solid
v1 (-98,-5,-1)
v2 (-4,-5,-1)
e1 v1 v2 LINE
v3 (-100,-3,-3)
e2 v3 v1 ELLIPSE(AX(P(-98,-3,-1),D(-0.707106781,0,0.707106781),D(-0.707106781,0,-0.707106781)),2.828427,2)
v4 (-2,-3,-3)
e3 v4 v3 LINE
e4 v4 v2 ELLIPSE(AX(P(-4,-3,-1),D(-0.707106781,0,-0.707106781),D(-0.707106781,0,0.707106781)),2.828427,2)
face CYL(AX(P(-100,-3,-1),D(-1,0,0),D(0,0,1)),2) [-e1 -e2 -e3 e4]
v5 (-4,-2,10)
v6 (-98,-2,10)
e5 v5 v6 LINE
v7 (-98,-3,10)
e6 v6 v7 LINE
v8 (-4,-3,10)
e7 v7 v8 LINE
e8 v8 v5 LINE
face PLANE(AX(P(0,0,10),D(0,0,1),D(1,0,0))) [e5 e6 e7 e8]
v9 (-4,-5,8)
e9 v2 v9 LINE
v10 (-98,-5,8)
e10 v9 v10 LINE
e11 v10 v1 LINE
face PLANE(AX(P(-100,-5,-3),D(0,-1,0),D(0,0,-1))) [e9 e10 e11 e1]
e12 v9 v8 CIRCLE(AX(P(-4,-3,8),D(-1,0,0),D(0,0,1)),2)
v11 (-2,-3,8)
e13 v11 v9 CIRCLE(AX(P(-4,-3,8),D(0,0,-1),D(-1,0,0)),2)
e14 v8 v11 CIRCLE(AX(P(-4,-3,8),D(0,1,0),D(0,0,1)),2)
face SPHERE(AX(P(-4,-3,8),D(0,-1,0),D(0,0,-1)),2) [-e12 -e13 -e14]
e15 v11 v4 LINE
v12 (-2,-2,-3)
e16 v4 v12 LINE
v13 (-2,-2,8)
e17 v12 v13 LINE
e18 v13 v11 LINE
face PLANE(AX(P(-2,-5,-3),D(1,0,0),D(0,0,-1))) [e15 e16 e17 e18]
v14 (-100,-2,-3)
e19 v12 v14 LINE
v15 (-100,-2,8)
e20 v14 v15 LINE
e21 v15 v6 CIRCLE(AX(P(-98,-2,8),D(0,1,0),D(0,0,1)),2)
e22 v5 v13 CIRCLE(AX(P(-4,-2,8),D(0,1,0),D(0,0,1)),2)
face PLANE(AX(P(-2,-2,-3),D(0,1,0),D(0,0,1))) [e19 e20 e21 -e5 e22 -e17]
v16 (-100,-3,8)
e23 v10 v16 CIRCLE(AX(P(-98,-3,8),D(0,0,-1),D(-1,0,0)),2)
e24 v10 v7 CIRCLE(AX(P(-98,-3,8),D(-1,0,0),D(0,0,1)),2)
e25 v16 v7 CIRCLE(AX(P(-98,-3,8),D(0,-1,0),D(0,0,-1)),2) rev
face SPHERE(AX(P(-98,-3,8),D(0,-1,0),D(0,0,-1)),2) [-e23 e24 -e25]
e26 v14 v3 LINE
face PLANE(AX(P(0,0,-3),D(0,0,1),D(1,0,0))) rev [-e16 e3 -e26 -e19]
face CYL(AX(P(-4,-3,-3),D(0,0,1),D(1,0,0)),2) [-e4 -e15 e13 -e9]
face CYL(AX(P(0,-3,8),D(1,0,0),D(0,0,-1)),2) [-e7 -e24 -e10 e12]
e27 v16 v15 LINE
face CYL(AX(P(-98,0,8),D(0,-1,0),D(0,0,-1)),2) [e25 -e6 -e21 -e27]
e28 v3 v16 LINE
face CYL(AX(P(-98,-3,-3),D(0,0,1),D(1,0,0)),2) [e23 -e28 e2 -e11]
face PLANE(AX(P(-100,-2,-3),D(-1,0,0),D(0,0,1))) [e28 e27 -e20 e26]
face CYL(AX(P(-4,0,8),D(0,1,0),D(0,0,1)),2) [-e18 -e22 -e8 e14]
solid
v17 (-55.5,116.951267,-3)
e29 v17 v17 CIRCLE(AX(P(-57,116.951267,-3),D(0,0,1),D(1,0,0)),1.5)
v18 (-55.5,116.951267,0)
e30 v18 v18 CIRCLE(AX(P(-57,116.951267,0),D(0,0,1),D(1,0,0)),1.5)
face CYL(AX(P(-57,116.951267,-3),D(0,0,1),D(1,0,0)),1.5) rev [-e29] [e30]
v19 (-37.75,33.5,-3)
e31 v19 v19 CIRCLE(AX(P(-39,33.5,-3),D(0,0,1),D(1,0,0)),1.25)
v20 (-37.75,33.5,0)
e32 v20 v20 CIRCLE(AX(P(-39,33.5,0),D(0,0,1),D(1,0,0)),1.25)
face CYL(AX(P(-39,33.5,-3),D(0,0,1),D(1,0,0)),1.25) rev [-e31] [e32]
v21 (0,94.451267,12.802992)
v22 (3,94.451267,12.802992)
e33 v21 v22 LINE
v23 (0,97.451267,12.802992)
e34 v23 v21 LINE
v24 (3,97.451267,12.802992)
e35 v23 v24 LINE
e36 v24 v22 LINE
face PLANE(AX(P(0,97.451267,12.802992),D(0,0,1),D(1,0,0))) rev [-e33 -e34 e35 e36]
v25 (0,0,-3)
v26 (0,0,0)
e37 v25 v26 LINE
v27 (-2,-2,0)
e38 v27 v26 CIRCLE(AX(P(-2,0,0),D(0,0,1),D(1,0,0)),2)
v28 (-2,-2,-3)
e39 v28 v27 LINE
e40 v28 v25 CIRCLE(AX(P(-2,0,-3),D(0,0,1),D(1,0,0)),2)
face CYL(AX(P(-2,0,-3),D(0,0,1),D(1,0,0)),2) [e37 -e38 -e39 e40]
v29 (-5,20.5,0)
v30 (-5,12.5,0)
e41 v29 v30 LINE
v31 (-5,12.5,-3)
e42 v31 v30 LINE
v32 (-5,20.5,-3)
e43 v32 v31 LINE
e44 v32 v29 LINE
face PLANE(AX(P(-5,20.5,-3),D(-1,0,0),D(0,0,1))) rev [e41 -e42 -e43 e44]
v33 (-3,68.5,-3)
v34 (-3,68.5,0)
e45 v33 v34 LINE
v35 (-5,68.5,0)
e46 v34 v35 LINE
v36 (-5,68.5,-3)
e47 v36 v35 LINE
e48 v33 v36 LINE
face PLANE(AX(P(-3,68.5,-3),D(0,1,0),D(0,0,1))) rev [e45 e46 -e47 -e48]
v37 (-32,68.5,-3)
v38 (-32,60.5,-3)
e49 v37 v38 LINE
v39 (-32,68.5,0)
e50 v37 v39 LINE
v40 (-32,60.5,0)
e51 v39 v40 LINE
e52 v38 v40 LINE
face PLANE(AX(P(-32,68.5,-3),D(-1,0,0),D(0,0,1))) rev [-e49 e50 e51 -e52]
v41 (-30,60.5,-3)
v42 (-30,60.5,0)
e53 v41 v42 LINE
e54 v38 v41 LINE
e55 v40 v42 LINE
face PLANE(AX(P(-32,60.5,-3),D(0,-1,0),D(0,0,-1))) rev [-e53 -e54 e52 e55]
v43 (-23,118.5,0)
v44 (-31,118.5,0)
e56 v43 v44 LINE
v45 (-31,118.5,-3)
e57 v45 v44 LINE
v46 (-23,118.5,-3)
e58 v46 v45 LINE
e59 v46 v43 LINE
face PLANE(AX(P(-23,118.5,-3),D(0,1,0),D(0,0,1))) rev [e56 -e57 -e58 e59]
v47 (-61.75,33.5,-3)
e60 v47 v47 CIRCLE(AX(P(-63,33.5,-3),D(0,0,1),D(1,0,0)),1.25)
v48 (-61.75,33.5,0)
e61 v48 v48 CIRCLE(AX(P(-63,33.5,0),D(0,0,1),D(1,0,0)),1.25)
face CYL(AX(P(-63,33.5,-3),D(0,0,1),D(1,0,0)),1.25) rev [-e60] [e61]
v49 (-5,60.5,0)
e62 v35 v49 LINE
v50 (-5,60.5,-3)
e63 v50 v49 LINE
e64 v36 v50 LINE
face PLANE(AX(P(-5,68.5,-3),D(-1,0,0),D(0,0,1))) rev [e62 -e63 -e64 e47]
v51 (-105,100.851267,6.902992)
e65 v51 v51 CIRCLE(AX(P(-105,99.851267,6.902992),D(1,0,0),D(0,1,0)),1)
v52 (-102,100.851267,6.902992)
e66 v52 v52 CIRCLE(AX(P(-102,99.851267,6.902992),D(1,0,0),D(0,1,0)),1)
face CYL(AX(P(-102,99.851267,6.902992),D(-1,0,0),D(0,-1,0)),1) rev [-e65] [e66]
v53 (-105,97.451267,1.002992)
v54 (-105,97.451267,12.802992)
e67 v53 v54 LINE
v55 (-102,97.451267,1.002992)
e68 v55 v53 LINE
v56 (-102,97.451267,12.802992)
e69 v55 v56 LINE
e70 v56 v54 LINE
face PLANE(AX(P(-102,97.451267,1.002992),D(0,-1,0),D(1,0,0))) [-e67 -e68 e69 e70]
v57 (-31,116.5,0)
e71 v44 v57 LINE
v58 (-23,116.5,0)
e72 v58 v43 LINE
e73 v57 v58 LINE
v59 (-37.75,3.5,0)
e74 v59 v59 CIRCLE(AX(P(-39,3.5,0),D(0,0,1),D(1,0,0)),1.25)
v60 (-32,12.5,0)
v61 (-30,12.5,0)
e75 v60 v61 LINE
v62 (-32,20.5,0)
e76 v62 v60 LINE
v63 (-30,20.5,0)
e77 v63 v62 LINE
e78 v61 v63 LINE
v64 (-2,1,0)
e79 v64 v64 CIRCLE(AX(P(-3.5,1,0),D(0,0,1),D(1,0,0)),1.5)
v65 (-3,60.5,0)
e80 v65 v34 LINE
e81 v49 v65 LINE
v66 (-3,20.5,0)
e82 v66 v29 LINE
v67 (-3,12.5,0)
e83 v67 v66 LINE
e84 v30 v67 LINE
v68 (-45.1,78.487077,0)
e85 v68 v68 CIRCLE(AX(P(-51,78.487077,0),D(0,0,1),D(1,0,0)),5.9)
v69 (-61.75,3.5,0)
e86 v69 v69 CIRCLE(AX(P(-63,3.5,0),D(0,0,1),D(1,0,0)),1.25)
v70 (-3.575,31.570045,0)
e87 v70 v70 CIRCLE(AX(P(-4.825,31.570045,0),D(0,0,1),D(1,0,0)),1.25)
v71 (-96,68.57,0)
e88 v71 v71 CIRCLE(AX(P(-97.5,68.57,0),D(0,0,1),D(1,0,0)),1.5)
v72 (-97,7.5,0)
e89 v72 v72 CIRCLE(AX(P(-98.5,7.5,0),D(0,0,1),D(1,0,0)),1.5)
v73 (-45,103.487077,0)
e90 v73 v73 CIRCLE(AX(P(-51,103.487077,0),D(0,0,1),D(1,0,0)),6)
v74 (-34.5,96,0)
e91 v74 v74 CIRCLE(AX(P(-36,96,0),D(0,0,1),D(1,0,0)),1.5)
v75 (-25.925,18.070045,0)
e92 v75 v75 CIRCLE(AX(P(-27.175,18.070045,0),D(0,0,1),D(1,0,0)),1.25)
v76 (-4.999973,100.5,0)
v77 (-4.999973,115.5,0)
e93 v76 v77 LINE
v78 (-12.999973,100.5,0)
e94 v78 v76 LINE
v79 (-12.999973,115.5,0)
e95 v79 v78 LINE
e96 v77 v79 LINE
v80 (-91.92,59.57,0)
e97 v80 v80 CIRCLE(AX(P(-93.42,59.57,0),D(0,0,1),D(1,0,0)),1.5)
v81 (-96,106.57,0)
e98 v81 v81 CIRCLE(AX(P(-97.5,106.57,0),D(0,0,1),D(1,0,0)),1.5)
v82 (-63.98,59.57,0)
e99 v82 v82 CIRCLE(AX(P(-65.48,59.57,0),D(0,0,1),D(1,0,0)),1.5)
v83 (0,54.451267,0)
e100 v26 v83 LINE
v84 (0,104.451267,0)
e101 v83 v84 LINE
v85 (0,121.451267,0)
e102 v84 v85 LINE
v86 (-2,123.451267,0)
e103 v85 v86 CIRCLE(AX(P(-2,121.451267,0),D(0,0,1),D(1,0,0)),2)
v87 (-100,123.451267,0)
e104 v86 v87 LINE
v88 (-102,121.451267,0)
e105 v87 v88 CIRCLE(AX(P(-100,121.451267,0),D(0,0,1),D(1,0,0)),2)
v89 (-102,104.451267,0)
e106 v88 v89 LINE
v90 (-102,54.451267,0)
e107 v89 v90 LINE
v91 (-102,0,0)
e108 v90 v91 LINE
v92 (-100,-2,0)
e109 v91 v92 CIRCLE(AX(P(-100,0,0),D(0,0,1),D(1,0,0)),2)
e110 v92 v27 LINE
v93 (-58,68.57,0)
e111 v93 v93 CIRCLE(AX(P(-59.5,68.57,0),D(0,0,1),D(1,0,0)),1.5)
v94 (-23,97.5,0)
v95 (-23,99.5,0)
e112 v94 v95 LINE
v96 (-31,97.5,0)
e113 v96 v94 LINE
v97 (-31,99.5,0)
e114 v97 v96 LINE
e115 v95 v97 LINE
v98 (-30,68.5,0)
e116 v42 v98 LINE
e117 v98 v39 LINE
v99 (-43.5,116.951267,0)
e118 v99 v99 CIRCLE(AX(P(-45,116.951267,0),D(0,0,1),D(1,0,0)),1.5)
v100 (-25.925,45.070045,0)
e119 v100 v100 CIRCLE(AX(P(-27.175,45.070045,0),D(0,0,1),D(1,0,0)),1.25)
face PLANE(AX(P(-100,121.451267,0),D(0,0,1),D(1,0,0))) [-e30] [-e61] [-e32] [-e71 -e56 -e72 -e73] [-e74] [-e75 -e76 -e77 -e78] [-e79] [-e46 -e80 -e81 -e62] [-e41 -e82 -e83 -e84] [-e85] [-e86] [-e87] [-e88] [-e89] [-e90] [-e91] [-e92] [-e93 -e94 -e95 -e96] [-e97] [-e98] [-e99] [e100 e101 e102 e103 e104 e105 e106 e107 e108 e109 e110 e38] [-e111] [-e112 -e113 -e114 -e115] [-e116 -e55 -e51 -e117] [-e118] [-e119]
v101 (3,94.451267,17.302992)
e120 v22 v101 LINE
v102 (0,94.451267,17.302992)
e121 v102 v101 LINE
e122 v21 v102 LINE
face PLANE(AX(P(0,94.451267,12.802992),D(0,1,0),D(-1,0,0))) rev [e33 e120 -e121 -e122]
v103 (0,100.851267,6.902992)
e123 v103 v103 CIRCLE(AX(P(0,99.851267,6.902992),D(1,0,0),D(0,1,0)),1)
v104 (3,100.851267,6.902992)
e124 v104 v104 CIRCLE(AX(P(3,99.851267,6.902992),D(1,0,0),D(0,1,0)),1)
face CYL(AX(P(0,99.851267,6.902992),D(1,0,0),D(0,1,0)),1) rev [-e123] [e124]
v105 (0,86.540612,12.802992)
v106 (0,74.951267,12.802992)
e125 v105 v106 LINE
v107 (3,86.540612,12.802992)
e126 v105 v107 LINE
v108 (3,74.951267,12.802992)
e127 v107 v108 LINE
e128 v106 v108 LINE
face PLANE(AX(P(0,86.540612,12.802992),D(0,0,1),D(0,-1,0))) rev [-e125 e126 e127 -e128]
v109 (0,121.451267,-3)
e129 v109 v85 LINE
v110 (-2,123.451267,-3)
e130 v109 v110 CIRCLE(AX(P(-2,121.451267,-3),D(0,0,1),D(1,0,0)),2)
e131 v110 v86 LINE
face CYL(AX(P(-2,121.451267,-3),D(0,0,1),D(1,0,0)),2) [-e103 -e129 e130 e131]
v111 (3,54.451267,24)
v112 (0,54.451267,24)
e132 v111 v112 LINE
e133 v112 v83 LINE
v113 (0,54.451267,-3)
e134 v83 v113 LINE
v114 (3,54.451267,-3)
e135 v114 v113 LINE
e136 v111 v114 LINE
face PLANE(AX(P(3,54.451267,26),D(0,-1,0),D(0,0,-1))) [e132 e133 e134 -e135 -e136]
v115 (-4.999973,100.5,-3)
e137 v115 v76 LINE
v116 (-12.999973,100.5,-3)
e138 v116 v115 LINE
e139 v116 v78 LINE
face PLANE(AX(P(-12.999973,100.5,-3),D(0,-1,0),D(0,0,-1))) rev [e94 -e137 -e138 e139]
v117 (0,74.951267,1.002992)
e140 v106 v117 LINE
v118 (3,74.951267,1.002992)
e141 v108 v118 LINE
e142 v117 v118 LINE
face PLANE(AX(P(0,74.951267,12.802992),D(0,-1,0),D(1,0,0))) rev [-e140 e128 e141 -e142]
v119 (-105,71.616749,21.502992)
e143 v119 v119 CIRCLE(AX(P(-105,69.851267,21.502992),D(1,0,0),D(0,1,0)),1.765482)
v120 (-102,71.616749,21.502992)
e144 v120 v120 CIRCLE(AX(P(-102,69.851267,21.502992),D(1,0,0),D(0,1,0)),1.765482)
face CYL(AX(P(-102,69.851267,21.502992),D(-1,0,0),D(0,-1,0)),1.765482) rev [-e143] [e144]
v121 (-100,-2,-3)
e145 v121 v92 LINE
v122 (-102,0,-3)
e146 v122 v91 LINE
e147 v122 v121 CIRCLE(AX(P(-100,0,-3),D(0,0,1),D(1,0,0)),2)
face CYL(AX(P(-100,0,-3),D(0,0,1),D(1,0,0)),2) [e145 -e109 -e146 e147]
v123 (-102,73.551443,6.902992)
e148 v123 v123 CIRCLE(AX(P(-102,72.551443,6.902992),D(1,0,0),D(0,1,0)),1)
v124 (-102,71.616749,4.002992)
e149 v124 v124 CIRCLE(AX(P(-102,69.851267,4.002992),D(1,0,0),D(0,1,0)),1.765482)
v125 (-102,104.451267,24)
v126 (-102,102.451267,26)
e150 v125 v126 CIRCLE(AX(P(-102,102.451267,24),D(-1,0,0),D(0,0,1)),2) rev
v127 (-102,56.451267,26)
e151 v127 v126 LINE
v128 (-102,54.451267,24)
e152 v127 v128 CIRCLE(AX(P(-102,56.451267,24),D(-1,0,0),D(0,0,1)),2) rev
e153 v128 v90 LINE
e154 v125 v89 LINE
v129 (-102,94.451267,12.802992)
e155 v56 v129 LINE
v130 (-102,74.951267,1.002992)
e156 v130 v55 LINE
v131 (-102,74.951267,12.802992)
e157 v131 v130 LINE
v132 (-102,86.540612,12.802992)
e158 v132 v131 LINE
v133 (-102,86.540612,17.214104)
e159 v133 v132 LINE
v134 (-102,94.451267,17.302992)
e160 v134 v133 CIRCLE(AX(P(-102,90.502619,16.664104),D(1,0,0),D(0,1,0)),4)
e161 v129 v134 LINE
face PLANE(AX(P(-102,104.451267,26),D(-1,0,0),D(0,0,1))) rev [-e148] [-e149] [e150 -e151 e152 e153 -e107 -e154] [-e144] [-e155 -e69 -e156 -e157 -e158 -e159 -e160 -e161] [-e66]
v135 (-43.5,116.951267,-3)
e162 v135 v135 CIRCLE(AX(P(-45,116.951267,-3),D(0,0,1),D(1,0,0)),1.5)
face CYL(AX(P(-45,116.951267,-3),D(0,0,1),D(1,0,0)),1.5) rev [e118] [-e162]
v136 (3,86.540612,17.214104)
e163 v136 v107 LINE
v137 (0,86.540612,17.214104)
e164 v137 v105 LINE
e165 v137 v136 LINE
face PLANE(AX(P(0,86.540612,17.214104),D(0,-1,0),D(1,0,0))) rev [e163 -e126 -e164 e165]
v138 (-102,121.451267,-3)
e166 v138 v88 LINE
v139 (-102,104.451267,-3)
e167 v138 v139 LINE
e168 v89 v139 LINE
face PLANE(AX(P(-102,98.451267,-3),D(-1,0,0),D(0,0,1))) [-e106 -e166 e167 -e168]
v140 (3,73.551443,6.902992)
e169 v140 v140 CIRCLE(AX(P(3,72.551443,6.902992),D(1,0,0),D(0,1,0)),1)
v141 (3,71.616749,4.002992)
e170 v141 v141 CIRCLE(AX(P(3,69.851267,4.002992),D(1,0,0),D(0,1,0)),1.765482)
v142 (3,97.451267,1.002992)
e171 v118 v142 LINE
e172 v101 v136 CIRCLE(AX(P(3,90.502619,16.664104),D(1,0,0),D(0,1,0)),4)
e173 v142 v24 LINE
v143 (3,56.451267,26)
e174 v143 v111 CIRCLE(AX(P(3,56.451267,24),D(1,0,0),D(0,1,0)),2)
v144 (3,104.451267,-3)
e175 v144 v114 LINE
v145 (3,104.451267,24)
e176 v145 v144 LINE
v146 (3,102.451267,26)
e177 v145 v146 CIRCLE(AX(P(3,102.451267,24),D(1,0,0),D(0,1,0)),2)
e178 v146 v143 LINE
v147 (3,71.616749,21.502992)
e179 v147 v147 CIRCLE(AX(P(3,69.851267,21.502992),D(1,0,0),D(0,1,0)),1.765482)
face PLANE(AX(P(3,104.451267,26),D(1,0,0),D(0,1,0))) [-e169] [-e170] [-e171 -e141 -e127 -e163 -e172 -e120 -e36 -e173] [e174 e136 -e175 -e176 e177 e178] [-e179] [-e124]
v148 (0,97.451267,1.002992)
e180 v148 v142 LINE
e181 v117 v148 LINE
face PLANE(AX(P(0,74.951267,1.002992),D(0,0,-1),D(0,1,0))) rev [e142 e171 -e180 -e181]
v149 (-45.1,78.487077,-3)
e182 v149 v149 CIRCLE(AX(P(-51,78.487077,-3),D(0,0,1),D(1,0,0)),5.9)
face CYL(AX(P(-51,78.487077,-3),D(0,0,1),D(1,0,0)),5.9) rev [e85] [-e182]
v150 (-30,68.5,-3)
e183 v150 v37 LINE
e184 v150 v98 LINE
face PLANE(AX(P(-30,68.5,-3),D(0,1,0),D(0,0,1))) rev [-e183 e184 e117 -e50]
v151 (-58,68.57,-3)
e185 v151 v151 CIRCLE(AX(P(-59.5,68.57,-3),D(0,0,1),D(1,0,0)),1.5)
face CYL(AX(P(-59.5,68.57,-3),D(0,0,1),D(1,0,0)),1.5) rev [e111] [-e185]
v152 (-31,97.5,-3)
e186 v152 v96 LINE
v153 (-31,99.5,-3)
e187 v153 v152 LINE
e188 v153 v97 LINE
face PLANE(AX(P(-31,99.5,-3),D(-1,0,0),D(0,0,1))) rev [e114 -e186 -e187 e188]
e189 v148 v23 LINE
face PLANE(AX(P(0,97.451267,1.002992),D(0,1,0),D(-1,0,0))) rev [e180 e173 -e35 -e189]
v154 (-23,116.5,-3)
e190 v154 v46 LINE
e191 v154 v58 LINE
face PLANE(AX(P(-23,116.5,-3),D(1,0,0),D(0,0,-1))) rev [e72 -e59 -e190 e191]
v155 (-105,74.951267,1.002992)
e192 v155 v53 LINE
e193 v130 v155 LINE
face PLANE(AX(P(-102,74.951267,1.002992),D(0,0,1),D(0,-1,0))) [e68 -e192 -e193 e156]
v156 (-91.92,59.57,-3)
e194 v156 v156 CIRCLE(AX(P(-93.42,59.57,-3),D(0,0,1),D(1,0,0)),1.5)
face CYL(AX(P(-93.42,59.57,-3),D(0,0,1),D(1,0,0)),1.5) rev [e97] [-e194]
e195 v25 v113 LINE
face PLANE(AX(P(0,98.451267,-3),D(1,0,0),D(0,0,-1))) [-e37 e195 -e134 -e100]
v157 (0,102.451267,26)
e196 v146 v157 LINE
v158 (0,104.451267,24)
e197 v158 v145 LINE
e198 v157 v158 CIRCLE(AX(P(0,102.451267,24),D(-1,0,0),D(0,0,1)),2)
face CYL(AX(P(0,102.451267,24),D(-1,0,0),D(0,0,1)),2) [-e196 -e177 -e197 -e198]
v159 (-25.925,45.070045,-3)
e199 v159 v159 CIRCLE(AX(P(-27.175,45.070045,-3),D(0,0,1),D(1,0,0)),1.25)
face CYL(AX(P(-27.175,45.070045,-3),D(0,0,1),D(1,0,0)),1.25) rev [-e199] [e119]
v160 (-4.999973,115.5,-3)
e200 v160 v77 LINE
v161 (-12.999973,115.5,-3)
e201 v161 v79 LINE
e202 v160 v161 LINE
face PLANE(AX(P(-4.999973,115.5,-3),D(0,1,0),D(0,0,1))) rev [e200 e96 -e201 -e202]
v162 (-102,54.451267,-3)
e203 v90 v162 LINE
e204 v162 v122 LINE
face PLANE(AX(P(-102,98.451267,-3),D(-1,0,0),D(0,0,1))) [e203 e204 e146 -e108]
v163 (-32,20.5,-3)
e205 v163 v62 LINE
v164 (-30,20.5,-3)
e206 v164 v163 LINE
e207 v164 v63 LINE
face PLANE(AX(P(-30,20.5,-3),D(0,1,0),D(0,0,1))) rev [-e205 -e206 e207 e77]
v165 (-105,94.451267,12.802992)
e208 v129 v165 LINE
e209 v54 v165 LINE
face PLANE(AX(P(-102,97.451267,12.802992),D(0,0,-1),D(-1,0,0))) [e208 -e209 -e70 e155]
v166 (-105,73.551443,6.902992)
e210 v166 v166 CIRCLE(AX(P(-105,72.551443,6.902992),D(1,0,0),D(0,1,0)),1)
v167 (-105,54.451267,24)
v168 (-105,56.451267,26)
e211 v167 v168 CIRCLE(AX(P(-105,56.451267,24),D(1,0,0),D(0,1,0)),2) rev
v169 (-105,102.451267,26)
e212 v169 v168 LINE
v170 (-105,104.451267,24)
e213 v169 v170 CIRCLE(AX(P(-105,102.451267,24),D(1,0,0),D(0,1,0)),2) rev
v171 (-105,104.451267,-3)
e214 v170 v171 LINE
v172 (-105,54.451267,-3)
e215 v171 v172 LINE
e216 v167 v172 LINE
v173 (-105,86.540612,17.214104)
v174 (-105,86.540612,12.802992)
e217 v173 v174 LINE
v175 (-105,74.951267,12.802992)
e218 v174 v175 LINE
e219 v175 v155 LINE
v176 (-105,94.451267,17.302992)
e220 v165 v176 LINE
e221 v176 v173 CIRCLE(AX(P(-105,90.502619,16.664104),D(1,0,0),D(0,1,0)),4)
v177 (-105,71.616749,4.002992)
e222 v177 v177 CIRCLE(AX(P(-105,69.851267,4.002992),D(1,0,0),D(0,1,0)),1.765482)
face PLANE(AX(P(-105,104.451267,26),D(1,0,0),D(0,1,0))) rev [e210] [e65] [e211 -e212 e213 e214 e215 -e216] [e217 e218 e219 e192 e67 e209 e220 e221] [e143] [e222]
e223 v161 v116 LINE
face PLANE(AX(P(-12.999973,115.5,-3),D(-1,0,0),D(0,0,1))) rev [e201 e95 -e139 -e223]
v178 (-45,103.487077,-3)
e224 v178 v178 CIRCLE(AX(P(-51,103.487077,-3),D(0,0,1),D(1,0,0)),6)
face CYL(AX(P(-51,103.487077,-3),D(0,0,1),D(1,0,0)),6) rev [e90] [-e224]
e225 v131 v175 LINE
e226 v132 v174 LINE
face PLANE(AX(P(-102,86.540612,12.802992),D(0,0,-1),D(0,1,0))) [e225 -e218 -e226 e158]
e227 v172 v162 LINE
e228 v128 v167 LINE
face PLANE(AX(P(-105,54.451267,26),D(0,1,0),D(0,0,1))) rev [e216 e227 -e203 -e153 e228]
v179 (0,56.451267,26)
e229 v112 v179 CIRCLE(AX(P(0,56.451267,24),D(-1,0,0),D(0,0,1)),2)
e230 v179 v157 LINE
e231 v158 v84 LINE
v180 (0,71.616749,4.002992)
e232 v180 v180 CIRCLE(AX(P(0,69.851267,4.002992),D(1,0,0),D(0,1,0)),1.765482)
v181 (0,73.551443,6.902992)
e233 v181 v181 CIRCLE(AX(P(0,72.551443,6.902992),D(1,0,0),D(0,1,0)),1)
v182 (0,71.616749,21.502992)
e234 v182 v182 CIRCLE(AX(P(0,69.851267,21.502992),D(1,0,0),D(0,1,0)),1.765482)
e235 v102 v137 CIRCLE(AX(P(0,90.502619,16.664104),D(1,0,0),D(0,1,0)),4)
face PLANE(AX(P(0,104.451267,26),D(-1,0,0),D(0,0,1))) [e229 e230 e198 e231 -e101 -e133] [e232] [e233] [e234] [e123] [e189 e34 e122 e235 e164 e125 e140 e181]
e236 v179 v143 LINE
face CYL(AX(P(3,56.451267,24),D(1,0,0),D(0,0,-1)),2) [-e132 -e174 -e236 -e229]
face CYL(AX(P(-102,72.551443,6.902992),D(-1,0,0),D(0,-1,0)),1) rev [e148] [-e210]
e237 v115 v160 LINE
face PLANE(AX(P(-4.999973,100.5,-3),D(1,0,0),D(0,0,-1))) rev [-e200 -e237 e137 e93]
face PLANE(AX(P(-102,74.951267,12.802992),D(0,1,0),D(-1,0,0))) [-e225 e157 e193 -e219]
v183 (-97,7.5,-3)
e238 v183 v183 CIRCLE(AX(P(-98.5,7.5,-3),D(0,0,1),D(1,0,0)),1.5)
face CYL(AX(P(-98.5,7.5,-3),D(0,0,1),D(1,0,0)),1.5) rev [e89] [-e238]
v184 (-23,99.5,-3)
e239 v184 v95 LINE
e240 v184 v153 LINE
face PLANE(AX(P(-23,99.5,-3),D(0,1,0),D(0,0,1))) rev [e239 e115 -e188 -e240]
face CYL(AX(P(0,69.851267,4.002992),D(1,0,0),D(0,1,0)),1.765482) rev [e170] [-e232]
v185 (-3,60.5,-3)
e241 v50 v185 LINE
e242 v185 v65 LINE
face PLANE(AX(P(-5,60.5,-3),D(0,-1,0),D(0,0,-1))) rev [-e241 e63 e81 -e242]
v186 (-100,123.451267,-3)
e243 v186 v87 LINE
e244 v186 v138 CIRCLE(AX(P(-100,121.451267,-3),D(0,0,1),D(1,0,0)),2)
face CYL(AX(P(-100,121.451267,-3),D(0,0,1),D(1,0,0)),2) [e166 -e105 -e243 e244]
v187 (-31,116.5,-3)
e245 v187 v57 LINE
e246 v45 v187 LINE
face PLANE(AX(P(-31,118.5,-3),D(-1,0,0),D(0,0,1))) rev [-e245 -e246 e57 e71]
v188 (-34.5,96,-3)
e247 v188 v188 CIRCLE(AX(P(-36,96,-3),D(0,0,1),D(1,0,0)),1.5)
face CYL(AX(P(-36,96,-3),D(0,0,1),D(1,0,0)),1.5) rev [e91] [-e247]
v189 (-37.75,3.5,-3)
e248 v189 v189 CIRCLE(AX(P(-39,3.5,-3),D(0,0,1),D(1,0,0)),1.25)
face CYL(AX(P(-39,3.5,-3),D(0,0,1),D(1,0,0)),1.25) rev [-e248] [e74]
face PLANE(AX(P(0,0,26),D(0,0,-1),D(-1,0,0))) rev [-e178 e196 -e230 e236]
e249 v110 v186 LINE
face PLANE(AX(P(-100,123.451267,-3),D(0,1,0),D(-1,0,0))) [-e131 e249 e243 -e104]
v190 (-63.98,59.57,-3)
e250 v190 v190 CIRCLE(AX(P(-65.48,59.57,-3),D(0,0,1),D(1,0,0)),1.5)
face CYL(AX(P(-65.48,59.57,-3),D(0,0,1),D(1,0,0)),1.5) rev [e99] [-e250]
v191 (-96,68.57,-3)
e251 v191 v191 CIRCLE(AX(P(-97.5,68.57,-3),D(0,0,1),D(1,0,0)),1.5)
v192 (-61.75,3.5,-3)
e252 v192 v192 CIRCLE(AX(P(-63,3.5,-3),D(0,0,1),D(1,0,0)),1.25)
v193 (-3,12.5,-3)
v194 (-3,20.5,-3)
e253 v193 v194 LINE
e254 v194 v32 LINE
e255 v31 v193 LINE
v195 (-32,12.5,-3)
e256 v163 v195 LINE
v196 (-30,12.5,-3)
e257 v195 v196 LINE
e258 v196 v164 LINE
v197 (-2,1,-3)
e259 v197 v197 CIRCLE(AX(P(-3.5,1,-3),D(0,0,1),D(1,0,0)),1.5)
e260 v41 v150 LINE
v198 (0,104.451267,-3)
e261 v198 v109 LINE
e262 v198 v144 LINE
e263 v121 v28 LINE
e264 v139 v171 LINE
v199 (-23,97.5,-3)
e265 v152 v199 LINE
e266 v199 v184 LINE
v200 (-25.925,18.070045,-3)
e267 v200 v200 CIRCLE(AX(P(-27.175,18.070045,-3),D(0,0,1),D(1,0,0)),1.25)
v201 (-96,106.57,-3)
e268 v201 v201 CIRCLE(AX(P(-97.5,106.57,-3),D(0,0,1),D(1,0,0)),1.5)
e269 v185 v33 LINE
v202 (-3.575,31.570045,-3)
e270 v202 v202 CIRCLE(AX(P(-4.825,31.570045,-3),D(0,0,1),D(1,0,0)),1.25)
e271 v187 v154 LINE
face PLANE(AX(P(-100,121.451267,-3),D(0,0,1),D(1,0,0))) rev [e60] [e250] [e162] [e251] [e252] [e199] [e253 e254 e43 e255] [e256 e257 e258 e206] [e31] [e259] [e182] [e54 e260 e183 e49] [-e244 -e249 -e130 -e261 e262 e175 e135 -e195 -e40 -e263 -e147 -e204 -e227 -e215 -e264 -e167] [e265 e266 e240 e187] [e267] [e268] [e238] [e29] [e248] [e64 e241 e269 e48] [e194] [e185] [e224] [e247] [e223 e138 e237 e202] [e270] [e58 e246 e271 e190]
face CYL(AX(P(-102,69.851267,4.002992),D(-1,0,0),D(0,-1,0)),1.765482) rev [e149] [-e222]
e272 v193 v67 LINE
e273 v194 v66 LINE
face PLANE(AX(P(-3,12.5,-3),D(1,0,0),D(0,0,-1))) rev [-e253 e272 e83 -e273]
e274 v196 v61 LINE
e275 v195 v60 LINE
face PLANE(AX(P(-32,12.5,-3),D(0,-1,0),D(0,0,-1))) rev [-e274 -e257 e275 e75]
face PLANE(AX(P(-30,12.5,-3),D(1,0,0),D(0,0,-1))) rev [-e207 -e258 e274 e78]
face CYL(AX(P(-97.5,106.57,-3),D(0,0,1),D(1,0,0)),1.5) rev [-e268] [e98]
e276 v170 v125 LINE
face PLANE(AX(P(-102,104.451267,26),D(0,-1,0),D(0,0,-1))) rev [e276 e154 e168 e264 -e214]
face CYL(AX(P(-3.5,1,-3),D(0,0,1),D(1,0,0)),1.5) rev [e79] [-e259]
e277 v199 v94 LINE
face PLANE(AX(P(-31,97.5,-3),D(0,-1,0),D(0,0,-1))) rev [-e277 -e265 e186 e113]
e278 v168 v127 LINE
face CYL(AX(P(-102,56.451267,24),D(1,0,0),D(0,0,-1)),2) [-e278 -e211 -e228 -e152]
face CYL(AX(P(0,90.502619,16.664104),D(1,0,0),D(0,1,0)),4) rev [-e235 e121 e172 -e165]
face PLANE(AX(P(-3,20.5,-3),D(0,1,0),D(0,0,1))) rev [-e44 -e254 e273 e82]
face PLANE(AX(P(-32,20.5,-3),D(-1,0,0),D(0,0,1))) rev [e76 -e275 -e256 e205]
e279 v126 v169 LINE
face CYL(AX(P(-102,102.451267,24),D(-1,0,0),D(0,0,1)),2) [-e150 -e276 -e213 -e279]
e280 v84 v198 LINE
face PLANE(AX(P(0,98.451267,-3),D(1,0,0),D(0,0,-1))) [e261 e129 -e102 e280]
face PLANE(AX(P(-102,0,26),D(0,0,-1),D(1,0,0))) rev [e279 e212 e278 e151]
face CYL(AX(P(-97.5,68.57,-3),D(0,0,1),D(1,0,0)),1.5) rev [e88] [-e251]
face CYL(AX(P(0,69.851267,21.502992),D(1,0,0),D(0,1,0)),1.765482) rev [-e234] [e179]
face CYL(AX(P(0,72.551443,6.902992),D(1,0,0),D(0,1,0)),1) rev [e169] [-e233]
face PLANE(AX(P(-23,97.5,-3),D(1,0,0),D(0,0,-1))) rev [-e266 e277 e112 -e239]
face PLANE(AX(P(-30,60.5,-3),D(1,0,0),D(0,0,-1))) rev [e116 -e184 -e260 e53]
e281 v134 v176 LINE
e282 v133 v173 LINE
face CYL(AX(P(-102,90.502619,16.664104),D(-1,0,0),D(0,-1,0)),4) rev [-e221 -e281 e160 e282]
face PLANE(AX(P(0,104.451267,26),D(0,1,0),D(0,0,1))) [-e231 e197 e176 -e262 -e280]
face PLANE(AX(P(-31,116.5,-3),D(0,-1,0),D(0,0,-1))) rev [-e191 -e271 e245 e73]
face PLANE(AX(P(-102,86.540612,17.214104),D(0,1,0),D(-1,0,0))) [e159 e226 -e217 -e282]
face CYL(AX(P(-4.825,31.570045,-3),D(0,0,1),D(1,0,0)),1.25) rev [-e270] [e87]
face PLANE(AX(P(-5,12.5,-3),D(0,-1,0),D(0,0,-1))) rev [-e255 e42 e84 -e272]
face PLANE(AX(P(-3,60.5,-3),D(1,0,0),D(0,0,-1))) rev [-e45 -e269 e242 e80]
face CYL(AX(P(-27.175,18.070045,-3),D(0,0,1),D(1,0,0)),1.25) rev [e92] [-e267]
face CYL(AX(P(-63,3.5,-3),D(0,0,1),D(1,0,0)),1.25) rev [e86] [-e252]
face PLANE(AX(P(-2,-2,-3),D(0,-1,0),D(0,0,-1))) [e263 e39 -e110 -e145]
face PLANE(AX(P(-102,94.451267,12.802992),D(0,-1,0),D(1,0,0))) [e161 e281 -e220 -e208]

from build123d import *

# Parameters (mm, degrees)
MODEL_R                      = 6
MODEL_R_2                    = 1.5
MODEL_R_3                    = 1.25
MODEL_R_4                    = 5.9
MODEL_W                      = 8
MODEL_H                      = 2
MODEL_H_2                    = 15
MODEL_W_2                    = 2
MODEL_H_3                    = 8
SALIENTE_EXTRUIR1_DEPTH      = 3
CROQUIS3_W                   = 3
CROQUIS3_H                   = 50
SALIENTE_EXTRUIR2_DEPTH      = 29
CROQUIS4_R                   = 1.765481919
CROQUIS4_R_2                 = 1
CORTAR_EXTRUIR1_DEPTH        = 3
SALIENTE_EXTRUIR3_DEPTH      = 10
SALIENTE_EXTRUIR3_DEPTH_BACK = 3
CROQUIS5_W                   = 98
CROQUIS5_H                   = 3
REDONDEO1_R                  = 2
REDONDEO2_R                  = 2
SIMETR_A2_START              = -105
SIMETR_A2_OUTLINE_R          = 1.765481919
SIMETR_A2_OUTLINE_R_2        = 1
SIMETR_A2_DEPTH              = 3
REDONDEO3_R                  = 2


# Read off the part's stored shape, not the designer's step: Simetría2
with BuildPart() as part:
    # Model → Saliente-Extruir1 (new body)
    with BuildSketch(Plane.XY):
        with BuildLine():
            Line((-97.99999958, -2), (-4, -2))
            Line((-4, -2), (-2, -2))
            ThreePointArc((-2, -2), (-0.585786438, -1.414213562), (0, 0))
            Line((0, 0), (0, 98.451266928))
            Line((0, 98.451266928), (0, 121.451266928))
            ThreePointArc((0, 121.451266928), (-0.585786438, 122.865480491), (-2, 123.451266928))
            Line((-2, 123.451266928), (-15.5, 123.451266928))
            Line((-15.5, 123.451266928), (-86.49999958, 123.451266928))
            Line((-86.49999958, 123.451266928), (-99.99999958, 123.451266928))
            ThreePointArc((-99.99999958, 123.451266928), (-101.414213142, 122.865480491), (-101.99999958, 121.451266928))
            Line((-101.99999958, 121.451266928), (-101.99999958, 98.451266928))
            Line((-101.99999958, 98.451266928), (-101.99999958, 0))
            ThreePointArc((-101.99999958, 0), (-101.414213142, -1.414213562), (-99.99999958, -2))
            Line((-99.99999958, -2), (-97.99999958, -2))
        make_face()
        with Locations((-50.99999979, 103.487076976)):
            Circle(MODEL_R, mode=Mode.SUBTRACT)
        with Locations((-97.5, 106.57)):
            Circle(MODEL_R_2, mode=Mode.SUBTRACT)
        with Locations((-65.47999979, 59.57)):
            Circle(MODEL_R_2, mode=Mode.SUBTRACT)
        with Locations((-93.41999979, 59.57)):
            Circle(MODEL_R_2, mode=Mode.SUBTRACT)
        with Locations((-62.99999979, 3.5)):
            Circle(MODEL_R_3, mode=Mode.SUBTRACT)
        with Locations((-98.49999979, 7.5)):
            Circle(MODEL_R_2, mode=Mode.SUBTRACT)
        with Locations((-38.99999979, 3.5)):
            Circle(MODEL_R_3, mode=Mode.SUBTRACT)
        with Locations((-38.99999979, 33.5)):
            Circle(MODEL_R_3, mode=Mode.SUBTRACT)
        with Locations((-62.99999979, 33.5)):
            Circle(MODEL_R_3, mode=Mode.SUBTRACT)
        with Locations((-59.5, 68.57)):
            Circle(MODEL_R_2, mode=Mode.SUBTRACT)
        with Locations((-97.5, 68.57)):
            Circle(MODEL_R_2, mode=Mode.SUBTRACT)
        with Locations((-4.825, 31.570044653)):
            Circle(MODEL_R_3, mode=Mode.SUBTRACT)
        with Locations((-27.175, 45.070044653)):
            Circle(MODEL_R_3, mode=Mode.SUBTRACT)
        with Locations((-27.175, 18.070044653)):
            Circle(MODEL_R_3, mode=Mode.SUBTRACT)
        with Locations((-45, 116.951266928)):
            Circle(MODEL_R_2, mode=Mode.SUBTRACT)
        with Locations((-3.5, 1)):
            Circle(MODEL_R_2, mode=Mode.SUBTRACT)
        with Locations((-36, 96)):
            Circle(MODEL_R_2, mode=Mode.SUBTRACT)
        with Locations((-50.99999979, 78.487076976)):
            Circle(MODEL_R_4, mode=Mode.SUBTRACT)
        with Locations((-57, 116.951266928)):
            Circle(MODEL_R_2, mode=Mode.SUBTRACT)
        with Locations((-27, 117.5)):
            Rectangle(MODEL_W, MODEL_H, mode=Mode.SUBTRACT)
        with Locations((-27, 98.5)):
            Rectangle(MODEL_W, MODEL_H, mode=Mode.SUBTRACT)
        with Locations((-8.99997272, 108)):
            Rectangle(MODEL_W, MODEL_H_2, mode=Mode.SUBTRACT)
        with Locations((-31, 16.5)):
            Rectangle(MODEL_W_2, MODEL_H_3, mode=Mode.SUBTRACT)
        with Locations((-4, 16.5)):
            Rectangle(MODEL_W_2, MODEL_H_3, mode=Mode.SUBTRACT)
        with Locations((-31, 64.5)):
            Rectangle(MODEL_W_2, MODEL_H_3, mode=Mode.SUBTRACT)
        with Locations((-4, 64.5)):
            Rectangle(MODEL_W_2, MODEL_H_3, mode=Mode.SUBTRACT)
    extrude(amount=-SALIENTE_EXTRUIR1_DEPTH)

    # Croquis3 → Saliente-Extruir2 (add)
    with BuildSketch(Plane(origin=(0, 0, -3), x_dir=(-1, 0, 0), z_dir=(0, 0, -1))):
        with Locations((-1.5, 79.451266928)):
            Rectangle(CROQUIS3_W, CROQUIS3_H)
    extrude(amount=-SALIENTE_EXTRUIR2_DEPTH)

    # Croquis4 → Cortar-Extruir1 (cut)
    with BuildSketch(Plane(origin=(3, 0, 0), x_dir=(0, 0, -1), z_dir=(1, 0, 0))):
        with Locations(Location((-21.50299208, 69.851266928, 0), (0, 0, 90))):
            Circle(CROQUIS4_R)
        with Locations(Location((-4.00299208, 69.851266928, 0), (0, 0, 90))):
            Circle(CROQUIS4_R)
        with Locations(Location((-6.90299208, 72.551442507, 0), (0, 0, 90))):
            Circle(CROQUIS4_R_2)
        with Locations(Location((-6.90299208, 99.851266928, 0), (0, 0, 90))):
            Circle(CROQUIS4_R_2)
        with BuildLine():
            Line((-1.00299208, 74.951266928), (-1.00299208, 97.451266928))
            Line((-1.00299208, 97.451266928), (-12.80299208, 97.451266928))
            Line((-12.80299208, 97.451266928), (-12.80299208, 94.451266928))
            Line((-12.80299208, 94.451266928), (-17.30299208, 94.451266928))
            ThreePointArc((-17.30299208, 94.451266928), (-20.663851557, 90.457675656), (-17.21410405, 86.540611727))
            Line((-17.21410405, 86.540611727), (-12.80299208, 86.540611727))
            Line((-12.80299208, 86.540611727), (-12.80299208, 74.951266928))
            Line((-12.80299208, 74.951266928), (-1.00299208, 74.951266928))
        make_face()
    extrude(amount=-CORTAR_EXTRUIR1_DEPTH, mode=Mode.SUBTRACT)

    # Redondeo1
    redondeo1_edges = [part.edges().sort_by_distance(p)[0] for p in [
        (1.5, 54.451266928, 26),
        (1.5, 104.451266928, 26),
    ]]
    fillet(redondeo1_edges, radius=REDONDEO1_R)


with BuildPart() as body_2:
    # Croquis5 → Saliente-Extruir3 (new, two sides: drawn at the far end of the back side and taken through both)
    with BuildSketch(Plane.XY.offset(-SALIENTE_EXTRUIR3_DEPTH_BACK)):
        with Locations((-51, -3.5)):
            Rectangle(CROQUIS5_W, CROQUIS5_H)
    extrude(amount=SALIENTE_EXTRUIR3_DEPTH + SALIENTE_EXTRUIR3_DEPTH_BACK)

    # Redondeo2
    redondeo2_edges = [body_2.edges().sort_by_distance(p)[0] for p in [
        (-100, -3.5, 10),
        (-2, -3.5, 10),
    ]]
    fillet(redondeo2_edges, radius=REDONDEO2_R)

    # Redondeo3
    redondeo3_edges = [body_2.edges().sort_by_distance(p)[0] for p in [
        (-51, -5, -3),
        (-51, -5, 10),
        (-2.585786438, -5, 9.414213562),
        (-99.414213562, -5, 9.414213562),
        (-2, -5, 2.5),
        (-100, -5, 2.5),
    ]]
    fillet(redondeo3_edges, radius=REDONDEO3_R)


with BuildPart() as simetr_a2_tool:
    # Simetría2 outline → Simetría2 (new body)
    with BuildSketch(Plane.YZ.offset(SIMETR_A2_START)):
        with BuildLine():
            Line((54.451266928, 24), (54.451266928, -3))
            Line((54.451266928, -3), (104.451266928, -3))
            Line((104.451266928, -3), (104.451266928, 24))
            ThreePointArc((104.451266928, 24), (103.865480491, 25.414213563), (102.451266928, 26))
            Line((102.451266928, 26), (56.451266928, 26))
            ThreePointArc((56.451266928, 26), (55.037053366, 25.414213562), (54.451266928, 24))
        make_face()
        with Locations((69.851266928, 4.00299208)):
            Circle(SIMETR_A2_OUTLINE_R, mode=Mode.SUBTRACT)
        with Locations((72.551442507, 6.90299208)):
            Circle(SIMETR_A2_OUTLINE_R_2, mode=Mode.SUBTRACT)
        with BuildLine():
            Line((86.540611727, 12.80299208), (86.540611727, 17.21410405))
            ThreePointArc((86.540611727, 17.21410405), (90.457675655, 20.663851557), (94.451266928, 17.30299208))
            Line((94.451266928, 17.30299208), (94.451266928, 12.80299208))
            Line((94.451266928, 12.80299208), (97.451266928, 12.80299208))
            Line((97.451266928, 12.80299208), (97.451266928, 1.00299208))
            Line((97.451266928, 1.00299208), (74.951266928, 1.00299208))
            Line((74.951266928, 1.00299208), (74.951266928, 12.80299208))
            Line((74.951266928, 12.80299208), (86.540611727, 12.80299208))
        make_face(mode=Mode.SUBTRACT)
        with Locations((99.851266928, 6.90299208)):
            Circle(SIMETR_A2_OUTLINE_R_2, mode=Mode.SUBTRACT)
        with Locations((69.851266928, 21.50299208)):
            Circle(SIMETR_A2_OUTLINE_R, mode=Mode.SUBTRACT)
    extrude(amount=SIMETR_A2_DEPTH)


with BuildPart() as part_1:
    add(part.part)


with BuildPart() as part_2:
    # Simetría2: joined with simetr_a2_tool
    add(part_1.part.fuse(simetr_a2_tool.part, tol=0.00001))


solid = Compound([body_2.part, part_2.part])
